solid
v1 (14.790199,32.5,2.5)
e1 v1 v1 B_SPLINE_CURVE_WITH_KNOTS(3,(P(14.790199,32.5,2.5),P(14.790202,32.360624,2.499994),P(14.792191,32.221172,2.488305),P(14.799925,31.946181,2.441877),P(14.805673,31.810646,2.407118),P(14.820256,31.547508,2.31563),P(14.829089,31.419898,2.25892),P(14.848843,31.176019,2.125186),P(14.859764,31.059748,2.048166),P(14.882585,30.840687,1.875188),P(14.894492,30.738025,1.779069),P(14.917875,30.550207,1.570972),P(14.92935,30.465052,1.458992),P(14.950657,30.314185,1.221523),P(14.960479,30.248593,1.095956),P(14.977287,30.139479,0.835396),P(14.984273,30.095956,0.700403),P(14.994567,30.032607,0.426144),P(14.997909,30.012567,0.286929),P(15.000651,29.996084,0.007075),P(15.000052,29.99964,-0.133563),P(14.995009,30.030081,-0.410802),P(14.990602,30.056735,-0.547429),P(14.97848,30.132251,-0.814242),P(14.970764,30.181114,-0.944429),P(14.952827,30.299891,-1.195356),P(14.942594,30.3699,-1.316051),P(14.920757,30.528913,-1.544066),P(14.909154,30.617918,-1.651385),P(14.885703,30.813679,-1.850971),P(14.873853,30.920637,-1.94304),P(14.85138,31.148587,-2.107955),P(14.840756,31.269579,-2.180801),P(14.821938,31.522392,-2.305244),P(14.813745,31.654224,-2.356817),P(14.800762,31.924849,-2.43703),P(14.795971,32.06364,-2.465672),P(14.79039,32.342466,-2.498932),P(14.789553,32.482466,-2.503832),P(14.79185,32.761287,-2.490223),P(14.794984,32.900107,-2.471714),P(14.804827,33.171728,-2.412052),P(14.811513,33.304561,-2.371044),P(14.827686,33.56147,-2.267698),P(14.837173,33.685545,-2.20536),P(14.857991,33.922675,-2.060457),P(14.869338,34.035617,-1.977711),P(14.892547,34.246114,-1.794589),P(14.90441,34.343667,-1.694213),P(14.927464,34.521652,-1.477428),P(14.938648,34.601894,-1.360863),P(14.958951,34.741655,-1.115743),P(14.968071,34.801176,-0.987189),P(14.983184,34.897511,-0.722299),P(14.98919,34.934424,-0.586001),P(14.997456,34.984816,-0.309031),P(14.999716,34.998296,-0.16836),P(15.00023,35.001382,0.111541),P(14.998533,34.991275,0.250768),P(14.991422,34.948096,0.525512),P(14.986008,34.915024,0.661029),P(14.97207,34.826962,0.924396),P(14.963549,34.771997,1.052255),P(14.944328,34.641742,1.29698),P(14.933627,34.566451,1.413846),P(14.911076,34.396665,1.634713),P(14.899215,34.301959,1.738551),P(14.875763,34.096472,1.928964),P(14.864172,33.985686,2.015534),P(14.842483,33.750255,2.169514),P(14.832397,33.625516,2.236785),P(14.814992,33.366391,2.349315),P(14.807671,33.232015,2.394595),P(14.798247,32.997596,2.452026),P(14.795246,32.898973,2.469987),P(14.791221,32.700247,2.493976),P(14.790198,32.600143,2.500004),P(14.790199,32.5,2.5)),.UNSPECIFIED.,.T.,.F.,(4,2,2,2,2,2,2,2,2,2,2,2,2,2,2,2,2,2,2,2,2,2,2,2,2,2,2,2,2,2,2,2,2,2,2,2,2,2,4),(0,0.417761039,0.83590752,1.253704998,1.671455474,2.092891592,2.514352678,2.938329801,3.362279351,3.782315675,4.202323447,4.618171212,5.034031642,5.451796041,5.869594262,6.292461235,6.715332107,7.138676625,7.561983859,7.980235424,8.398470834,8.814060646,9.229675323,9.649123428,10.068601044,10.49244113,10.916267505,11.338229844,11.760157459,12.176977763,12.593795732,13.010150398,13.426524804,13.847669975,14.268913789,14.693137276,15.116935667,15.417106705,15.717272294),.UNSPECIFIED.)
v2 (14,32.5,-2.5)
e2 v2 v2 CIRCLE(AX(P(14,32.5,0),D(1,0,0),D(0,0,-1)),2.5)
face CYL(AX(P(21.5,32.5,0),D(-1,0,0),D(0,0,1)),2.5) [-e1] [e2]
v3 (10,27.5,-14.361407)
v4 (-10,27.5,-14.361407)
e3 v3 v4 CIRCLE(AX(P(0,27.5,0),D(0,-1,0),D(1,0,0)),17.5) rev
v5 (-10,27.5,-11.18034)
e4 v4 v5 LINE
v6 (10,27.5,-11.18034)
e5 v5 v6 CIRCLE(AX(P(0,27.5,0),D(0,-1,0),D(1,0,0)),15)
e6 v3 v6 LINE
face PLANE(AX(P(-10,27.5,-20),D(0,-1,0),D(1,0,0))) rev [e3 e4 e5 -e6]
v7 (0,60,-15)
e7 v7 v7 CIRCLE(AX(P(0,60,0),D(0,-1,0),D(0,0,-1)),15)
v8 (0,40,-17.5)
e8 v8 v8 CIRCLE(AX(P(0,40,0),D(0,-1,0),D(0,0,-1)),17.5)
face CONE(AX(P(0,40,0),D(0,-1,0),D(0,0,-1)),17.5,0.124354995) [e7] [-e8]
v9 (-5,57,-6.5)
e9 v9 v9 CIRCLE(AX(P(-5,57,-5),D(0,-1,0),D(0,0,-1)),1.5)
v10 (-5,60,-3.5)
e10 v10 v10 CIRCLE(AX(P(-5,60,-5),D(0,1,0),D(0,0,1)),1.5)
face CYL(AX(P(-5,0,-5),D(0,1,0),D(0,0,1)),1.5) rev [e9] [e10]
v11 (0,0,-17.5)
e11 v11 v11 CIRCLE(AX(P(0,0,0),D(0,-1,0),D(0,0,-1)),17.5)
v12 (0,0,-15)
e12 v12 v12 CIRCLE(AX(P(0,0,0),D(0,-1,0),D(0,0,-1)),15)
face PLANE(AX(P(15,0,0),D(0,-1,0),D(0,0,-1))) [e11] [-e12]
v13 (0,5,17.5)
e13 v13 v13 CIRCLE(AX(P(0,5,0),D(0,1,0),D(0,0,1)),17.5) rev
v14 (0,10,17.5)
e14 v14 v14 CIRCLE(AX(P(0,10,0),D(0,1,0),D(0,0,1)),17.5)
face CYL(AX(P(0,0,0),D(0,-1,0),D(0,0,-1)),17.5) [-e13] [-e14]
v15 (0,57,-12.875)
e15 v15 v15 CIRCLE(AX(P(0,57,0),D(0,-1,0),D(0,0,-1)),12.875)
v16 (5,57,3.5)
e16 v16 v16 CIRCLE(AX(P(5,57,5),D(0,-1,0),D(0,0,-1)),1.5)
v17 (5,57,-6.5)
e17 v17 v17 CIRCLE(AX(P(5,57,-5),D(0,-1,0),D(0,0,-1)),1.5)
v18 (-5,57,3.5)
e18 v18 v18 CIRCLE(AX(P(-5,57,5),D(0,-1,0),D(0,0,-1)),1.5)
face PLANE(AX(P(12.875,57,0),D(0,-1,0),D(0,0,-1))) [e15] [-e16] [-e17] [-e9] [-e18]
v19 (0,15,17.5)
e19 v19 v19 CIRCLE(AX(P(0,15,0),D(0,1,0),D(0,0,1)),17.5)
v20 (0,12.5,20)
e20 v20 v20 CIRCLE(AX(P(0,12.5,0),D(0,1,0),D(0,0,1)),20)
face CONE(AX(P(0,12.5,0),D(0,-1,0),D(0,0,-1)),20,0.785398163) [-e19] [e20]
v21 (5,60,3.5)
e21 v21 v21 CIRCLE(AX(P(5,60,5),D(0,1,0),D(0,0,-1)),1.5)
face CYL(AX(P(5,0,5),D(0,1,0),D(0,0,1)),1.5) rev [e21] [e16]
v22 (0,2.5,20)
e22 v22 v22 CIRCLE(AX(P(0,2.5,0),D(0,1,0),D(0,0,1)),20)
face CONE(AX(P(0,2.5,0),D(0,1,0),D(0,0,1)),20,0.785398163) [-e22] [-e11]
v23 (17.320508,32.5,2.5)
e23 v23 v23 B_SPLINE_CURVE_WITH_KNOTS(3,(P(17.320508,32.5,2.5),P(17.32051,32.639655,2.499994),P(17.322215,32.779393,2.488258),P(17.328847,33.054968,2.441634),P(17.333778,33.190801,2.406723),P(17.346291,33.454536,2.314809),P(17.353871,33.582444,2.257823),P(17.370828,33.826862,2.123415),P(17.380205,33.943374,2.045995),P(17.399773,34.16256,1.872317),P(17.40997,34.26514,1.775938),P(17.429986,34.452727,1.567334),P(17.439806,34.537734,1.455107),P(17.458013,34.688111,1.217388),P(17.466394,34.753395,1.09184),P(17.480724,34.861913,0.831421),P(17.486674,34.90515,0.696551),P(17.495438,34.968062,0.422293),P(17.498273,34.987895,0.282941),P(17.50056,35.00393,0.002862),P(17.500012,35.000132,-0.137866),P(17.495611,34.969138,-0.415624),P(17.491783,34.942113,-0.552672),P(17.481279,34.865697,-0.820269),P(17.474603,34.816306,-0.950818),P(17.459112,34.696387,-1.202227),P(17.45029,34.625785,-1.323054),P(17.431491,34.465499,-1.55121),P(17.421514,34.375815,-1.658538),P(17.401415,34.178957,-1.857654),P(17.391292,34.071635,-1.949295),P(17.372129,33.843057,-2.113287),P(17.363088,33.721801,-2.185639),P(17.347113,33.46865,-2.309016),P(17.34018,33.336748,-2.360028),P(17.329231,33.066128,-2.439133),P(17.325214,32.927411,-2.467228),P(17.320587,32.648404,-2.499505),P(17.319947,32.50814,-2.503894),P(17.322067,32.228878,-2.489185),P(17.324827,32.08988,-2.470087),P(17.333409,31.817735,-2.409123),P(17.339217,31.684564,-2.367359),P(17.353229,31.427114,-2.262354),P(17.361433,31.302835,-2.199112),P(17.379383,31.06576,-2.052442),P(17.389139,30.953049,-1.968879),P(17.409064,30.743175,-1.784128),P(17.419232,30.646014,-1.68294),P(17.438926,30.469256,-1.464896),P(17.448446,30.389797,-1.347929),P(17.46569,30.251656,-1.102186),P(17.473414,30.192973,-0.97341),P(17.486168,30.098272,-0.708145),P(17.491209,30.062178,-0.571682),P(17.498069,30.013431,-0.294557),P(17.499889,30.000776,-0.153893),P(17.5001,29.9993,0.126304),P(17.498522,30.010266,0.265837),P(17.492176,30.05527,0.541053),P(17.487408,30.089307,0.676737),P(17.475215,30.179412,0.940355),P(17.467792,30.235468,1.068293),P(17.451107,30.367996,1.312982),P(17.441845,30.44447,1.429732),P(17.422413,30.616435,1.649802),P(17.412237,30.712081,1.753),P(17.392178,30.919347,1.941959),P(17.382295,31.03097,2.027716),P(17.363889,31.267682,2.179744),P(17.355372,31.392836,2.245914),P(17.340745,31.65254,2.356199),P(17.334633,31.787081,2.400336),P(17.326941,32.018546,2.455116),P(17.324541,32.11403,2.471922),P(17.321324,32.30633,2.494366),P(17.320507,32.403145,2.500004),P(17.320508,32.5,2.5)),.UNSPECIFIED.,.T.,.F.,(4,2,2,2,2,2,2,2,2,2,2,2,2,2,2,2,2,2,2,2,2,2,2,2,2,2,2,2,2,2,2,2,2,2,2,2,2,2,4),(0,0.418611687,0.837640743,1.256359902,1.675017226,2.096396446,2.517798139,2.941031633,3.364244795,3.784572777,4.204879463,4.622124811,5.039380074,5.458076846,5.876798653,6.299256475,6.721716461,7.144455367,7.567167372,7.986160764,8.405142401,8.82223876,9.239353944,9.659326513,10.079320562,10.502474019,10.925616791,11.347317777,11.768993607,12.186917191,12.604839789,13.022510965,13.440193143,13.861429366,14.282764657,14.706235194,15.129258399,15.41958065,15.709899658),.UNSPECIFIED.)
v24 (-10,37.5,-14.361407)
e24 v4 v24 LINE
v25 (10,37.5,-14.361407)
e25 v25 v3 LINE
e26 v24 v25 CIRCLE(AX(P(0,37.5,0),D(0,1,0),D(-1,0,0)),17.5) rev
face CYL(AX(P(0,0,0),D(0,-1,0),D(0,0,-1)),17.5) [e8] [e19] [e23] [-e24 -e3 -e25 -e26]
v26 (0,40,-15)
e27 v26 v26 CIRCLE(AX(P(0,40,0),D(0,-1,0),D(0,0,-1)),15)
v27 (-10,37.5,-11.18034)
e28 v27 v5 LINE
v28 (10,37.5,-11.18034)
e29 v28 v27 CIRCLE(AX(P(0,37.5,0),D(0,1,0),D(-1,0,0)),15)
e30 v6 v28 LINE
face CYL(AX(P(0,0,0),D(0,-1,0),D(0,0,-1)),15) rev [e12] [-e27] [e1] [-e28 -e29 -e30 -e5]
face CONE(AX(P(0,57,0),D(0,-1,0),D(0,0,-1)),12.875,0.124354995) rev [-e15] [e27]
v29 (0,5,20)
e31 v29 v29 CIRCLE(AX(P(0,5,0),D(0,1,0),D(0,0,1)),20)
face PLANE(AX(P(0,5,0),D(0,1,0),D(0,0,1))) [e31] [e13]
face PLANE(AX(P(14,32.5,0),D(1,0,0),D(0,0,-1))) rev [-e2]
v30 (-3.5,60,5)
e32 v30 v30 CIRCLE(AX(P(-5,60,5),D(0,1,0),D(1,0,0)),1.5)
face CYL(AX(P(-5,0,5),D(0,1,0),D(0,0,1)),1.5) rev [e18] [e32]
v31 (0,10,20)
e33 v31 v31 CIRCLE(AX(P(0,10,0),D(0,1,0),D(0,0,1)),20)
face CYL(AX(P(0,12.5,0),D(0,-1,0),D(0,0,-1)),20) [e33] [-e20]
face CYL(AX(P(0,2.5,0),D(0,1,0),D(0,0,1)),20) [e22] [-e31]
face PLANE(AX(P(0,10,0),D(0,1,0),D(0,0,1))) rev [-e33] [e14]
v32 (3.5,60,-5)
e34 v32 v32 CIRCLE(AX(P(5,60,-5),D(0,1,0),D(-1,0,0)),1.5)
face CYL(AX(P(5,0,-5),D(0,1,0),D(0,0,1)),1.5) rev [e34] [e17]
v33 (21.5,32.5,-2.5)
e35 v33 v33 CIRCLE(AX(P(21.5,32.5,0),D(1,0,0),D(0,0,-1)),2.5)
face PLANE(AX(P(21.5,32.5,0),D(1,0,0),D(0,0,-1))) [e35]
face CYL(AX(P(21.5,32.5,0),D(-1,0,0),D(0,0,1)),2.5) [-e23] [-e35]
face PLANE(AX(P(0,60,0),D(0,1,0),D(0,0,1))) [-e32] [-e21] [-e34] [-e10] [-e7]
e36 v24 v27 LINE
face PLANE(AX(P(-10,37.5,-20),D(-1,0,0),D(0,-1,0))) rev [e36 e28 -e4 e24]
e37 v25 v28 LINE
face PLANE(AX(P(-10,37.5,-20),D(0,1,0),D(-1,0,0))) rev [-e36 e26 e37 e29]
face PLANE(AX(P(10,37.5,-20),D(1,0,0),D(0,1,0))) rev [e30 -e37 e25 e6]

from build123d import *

# Parameters (mm, degrees)
SKETCH2_R           = 2.5
BOSS_EXTRUDE1_DEPTH = 7.5
SKETCH4_R           = 20
SKETCH4_R_2         = 17.5
BOSS_EXTRUDE3_DEPTH = 2.5
BOSS_EXTRUDE4_START = 2.5
SKETCH5_R           = 20
SKETCH5_R_2         = 17.5
BOSS_EXTRUDE4_DEPTH = 2.5
SKETCH6_R           = 1.5
CUT_EXTRUDE1_DEPTH  = 67.800074972
CIRPATTERN1_COUNT   = 4
SKETCH7_W           = 20
SKETCH7_H           = 10
CUT_EXTRUDE2_DEPTH  = 67.800074882
CHAMFER1_SIZE       = 2.5


with BuildPart() as part:
    # Sketch1 → Revolve1 (revolve)
    with BuildSketch(Plane.XY, mode=Mode.PRIVATE) as revolve1_sk:
        Polygon((15, 0), (17.5, 0), (17.5, 40), (15, 60), (0, 60), (0, 57), (12.875, 57), (15, 40), align=None)
    revolve(revolve1_sk.sketch.rotate(Axis((0, 0, 0), (0, 1, 0)), 90), axis=Axis((0, 0, 0), (0, 1, 0)))

    # Sketch2 → Boss-Extrude1 (add)
    with BuildSketch(Plane(origin=(14, 0, 0), x_dir=(0, 0, -1), z_dir=(1, 0, 0))):
        with Locations(Location((0, 32.5, 0), (0, 0, 180))):
            Circle(SKETCH2_R)
    extrude(amount=BOSS_EXTRUDE1_DEPTH)

    # Sketch4 → Boss-Extrude3 (add)
    with BuildSketch(Plane(origin=(0, 5, 0), x_dir=(1, 0, 0), z_dir=(0, 1, 0))):
        with Locations(Location((0, 0, 0), (0, 0, 270))):
            Circle(SKETCH4_R)
        with Locations(Location((0, 0, 0), (0, 0, 90))):
            Circle(SKETCH4_R_2, mode=Mode.SUBTRACT)
    extrude(amount=-BOSS_EXTRUDE3_DEPTH)

    # Sketch5 → Boss-Extrude4 (add)
    with BuildSketch(Plane(origin=(0, 10, 0), x_dir=(1, 0, 0), z_dir=(0, 1, 0)).offset(BOSS_EXTRUDE4_START)):
        with Locations(Location((0, 0, 0), (0, 0, 270))):
            Circle(SKETCH5_R)
        with Locations(Location((0, 0, 0), (0, 0, 270))):
            Circle(SKETCH5_R_2, mode=Mode.SUBTRACT)
    extrude(amount=-BOSS_EXTRUDE4_DEPTH)

    # Sketch6 → Cut-Extrude1 (cut, through all)
    with BuildSketch(Plane(origin=(0, 60, 0), x_dir=(1, 0, 0), z_dir=(0, 1, 0))):
        with Locations(Location((-5, 5, 0), (0, 0, 270))):
            Circle(SKETCH6_R)
    cut_extrude1 = extrude(amount=-CUT_EXTRUDE1_DEPTH, mode=Mode.SUBTRACT)

    # CirPattern1: Cut-Extrude1 ×4 about axis
    cirpattern1_axis = Axis((0, 0, 0), (0, 1, 0))
    for i in range(1, CIRPATTERN1_COUNT):
        add(cut_extrude1.rotate(cirpattern1_axis, i * 360 / CIRPATTERN1_COUNT), mode=Mode.SUBTRACT)

    # Sketch7 → Cut-Extrude2 (cut, through all)
    with BuildSketch(Plane.XY):
        with Locations((0, 32.5)):
            Rectangle(SKETCH7_W, SKETCH7_H)
    extrude(amount=-CUT_EXTRUDE2_DEPTH, mode=Mode.SUBTRACT)

    # Chamfer1
    chamfer1_edges = [part.edges().sort_by_distance(p)[0] for p in [
        (0, 2.5, 17.5),
        (0, 12.5, 17.5),
    ]]
    chamfer(chamfer1_edges, length=CHAMFER1_SIZE - 0.0001)  # a hair under: the kernel refuses the full size


solid = part.part
